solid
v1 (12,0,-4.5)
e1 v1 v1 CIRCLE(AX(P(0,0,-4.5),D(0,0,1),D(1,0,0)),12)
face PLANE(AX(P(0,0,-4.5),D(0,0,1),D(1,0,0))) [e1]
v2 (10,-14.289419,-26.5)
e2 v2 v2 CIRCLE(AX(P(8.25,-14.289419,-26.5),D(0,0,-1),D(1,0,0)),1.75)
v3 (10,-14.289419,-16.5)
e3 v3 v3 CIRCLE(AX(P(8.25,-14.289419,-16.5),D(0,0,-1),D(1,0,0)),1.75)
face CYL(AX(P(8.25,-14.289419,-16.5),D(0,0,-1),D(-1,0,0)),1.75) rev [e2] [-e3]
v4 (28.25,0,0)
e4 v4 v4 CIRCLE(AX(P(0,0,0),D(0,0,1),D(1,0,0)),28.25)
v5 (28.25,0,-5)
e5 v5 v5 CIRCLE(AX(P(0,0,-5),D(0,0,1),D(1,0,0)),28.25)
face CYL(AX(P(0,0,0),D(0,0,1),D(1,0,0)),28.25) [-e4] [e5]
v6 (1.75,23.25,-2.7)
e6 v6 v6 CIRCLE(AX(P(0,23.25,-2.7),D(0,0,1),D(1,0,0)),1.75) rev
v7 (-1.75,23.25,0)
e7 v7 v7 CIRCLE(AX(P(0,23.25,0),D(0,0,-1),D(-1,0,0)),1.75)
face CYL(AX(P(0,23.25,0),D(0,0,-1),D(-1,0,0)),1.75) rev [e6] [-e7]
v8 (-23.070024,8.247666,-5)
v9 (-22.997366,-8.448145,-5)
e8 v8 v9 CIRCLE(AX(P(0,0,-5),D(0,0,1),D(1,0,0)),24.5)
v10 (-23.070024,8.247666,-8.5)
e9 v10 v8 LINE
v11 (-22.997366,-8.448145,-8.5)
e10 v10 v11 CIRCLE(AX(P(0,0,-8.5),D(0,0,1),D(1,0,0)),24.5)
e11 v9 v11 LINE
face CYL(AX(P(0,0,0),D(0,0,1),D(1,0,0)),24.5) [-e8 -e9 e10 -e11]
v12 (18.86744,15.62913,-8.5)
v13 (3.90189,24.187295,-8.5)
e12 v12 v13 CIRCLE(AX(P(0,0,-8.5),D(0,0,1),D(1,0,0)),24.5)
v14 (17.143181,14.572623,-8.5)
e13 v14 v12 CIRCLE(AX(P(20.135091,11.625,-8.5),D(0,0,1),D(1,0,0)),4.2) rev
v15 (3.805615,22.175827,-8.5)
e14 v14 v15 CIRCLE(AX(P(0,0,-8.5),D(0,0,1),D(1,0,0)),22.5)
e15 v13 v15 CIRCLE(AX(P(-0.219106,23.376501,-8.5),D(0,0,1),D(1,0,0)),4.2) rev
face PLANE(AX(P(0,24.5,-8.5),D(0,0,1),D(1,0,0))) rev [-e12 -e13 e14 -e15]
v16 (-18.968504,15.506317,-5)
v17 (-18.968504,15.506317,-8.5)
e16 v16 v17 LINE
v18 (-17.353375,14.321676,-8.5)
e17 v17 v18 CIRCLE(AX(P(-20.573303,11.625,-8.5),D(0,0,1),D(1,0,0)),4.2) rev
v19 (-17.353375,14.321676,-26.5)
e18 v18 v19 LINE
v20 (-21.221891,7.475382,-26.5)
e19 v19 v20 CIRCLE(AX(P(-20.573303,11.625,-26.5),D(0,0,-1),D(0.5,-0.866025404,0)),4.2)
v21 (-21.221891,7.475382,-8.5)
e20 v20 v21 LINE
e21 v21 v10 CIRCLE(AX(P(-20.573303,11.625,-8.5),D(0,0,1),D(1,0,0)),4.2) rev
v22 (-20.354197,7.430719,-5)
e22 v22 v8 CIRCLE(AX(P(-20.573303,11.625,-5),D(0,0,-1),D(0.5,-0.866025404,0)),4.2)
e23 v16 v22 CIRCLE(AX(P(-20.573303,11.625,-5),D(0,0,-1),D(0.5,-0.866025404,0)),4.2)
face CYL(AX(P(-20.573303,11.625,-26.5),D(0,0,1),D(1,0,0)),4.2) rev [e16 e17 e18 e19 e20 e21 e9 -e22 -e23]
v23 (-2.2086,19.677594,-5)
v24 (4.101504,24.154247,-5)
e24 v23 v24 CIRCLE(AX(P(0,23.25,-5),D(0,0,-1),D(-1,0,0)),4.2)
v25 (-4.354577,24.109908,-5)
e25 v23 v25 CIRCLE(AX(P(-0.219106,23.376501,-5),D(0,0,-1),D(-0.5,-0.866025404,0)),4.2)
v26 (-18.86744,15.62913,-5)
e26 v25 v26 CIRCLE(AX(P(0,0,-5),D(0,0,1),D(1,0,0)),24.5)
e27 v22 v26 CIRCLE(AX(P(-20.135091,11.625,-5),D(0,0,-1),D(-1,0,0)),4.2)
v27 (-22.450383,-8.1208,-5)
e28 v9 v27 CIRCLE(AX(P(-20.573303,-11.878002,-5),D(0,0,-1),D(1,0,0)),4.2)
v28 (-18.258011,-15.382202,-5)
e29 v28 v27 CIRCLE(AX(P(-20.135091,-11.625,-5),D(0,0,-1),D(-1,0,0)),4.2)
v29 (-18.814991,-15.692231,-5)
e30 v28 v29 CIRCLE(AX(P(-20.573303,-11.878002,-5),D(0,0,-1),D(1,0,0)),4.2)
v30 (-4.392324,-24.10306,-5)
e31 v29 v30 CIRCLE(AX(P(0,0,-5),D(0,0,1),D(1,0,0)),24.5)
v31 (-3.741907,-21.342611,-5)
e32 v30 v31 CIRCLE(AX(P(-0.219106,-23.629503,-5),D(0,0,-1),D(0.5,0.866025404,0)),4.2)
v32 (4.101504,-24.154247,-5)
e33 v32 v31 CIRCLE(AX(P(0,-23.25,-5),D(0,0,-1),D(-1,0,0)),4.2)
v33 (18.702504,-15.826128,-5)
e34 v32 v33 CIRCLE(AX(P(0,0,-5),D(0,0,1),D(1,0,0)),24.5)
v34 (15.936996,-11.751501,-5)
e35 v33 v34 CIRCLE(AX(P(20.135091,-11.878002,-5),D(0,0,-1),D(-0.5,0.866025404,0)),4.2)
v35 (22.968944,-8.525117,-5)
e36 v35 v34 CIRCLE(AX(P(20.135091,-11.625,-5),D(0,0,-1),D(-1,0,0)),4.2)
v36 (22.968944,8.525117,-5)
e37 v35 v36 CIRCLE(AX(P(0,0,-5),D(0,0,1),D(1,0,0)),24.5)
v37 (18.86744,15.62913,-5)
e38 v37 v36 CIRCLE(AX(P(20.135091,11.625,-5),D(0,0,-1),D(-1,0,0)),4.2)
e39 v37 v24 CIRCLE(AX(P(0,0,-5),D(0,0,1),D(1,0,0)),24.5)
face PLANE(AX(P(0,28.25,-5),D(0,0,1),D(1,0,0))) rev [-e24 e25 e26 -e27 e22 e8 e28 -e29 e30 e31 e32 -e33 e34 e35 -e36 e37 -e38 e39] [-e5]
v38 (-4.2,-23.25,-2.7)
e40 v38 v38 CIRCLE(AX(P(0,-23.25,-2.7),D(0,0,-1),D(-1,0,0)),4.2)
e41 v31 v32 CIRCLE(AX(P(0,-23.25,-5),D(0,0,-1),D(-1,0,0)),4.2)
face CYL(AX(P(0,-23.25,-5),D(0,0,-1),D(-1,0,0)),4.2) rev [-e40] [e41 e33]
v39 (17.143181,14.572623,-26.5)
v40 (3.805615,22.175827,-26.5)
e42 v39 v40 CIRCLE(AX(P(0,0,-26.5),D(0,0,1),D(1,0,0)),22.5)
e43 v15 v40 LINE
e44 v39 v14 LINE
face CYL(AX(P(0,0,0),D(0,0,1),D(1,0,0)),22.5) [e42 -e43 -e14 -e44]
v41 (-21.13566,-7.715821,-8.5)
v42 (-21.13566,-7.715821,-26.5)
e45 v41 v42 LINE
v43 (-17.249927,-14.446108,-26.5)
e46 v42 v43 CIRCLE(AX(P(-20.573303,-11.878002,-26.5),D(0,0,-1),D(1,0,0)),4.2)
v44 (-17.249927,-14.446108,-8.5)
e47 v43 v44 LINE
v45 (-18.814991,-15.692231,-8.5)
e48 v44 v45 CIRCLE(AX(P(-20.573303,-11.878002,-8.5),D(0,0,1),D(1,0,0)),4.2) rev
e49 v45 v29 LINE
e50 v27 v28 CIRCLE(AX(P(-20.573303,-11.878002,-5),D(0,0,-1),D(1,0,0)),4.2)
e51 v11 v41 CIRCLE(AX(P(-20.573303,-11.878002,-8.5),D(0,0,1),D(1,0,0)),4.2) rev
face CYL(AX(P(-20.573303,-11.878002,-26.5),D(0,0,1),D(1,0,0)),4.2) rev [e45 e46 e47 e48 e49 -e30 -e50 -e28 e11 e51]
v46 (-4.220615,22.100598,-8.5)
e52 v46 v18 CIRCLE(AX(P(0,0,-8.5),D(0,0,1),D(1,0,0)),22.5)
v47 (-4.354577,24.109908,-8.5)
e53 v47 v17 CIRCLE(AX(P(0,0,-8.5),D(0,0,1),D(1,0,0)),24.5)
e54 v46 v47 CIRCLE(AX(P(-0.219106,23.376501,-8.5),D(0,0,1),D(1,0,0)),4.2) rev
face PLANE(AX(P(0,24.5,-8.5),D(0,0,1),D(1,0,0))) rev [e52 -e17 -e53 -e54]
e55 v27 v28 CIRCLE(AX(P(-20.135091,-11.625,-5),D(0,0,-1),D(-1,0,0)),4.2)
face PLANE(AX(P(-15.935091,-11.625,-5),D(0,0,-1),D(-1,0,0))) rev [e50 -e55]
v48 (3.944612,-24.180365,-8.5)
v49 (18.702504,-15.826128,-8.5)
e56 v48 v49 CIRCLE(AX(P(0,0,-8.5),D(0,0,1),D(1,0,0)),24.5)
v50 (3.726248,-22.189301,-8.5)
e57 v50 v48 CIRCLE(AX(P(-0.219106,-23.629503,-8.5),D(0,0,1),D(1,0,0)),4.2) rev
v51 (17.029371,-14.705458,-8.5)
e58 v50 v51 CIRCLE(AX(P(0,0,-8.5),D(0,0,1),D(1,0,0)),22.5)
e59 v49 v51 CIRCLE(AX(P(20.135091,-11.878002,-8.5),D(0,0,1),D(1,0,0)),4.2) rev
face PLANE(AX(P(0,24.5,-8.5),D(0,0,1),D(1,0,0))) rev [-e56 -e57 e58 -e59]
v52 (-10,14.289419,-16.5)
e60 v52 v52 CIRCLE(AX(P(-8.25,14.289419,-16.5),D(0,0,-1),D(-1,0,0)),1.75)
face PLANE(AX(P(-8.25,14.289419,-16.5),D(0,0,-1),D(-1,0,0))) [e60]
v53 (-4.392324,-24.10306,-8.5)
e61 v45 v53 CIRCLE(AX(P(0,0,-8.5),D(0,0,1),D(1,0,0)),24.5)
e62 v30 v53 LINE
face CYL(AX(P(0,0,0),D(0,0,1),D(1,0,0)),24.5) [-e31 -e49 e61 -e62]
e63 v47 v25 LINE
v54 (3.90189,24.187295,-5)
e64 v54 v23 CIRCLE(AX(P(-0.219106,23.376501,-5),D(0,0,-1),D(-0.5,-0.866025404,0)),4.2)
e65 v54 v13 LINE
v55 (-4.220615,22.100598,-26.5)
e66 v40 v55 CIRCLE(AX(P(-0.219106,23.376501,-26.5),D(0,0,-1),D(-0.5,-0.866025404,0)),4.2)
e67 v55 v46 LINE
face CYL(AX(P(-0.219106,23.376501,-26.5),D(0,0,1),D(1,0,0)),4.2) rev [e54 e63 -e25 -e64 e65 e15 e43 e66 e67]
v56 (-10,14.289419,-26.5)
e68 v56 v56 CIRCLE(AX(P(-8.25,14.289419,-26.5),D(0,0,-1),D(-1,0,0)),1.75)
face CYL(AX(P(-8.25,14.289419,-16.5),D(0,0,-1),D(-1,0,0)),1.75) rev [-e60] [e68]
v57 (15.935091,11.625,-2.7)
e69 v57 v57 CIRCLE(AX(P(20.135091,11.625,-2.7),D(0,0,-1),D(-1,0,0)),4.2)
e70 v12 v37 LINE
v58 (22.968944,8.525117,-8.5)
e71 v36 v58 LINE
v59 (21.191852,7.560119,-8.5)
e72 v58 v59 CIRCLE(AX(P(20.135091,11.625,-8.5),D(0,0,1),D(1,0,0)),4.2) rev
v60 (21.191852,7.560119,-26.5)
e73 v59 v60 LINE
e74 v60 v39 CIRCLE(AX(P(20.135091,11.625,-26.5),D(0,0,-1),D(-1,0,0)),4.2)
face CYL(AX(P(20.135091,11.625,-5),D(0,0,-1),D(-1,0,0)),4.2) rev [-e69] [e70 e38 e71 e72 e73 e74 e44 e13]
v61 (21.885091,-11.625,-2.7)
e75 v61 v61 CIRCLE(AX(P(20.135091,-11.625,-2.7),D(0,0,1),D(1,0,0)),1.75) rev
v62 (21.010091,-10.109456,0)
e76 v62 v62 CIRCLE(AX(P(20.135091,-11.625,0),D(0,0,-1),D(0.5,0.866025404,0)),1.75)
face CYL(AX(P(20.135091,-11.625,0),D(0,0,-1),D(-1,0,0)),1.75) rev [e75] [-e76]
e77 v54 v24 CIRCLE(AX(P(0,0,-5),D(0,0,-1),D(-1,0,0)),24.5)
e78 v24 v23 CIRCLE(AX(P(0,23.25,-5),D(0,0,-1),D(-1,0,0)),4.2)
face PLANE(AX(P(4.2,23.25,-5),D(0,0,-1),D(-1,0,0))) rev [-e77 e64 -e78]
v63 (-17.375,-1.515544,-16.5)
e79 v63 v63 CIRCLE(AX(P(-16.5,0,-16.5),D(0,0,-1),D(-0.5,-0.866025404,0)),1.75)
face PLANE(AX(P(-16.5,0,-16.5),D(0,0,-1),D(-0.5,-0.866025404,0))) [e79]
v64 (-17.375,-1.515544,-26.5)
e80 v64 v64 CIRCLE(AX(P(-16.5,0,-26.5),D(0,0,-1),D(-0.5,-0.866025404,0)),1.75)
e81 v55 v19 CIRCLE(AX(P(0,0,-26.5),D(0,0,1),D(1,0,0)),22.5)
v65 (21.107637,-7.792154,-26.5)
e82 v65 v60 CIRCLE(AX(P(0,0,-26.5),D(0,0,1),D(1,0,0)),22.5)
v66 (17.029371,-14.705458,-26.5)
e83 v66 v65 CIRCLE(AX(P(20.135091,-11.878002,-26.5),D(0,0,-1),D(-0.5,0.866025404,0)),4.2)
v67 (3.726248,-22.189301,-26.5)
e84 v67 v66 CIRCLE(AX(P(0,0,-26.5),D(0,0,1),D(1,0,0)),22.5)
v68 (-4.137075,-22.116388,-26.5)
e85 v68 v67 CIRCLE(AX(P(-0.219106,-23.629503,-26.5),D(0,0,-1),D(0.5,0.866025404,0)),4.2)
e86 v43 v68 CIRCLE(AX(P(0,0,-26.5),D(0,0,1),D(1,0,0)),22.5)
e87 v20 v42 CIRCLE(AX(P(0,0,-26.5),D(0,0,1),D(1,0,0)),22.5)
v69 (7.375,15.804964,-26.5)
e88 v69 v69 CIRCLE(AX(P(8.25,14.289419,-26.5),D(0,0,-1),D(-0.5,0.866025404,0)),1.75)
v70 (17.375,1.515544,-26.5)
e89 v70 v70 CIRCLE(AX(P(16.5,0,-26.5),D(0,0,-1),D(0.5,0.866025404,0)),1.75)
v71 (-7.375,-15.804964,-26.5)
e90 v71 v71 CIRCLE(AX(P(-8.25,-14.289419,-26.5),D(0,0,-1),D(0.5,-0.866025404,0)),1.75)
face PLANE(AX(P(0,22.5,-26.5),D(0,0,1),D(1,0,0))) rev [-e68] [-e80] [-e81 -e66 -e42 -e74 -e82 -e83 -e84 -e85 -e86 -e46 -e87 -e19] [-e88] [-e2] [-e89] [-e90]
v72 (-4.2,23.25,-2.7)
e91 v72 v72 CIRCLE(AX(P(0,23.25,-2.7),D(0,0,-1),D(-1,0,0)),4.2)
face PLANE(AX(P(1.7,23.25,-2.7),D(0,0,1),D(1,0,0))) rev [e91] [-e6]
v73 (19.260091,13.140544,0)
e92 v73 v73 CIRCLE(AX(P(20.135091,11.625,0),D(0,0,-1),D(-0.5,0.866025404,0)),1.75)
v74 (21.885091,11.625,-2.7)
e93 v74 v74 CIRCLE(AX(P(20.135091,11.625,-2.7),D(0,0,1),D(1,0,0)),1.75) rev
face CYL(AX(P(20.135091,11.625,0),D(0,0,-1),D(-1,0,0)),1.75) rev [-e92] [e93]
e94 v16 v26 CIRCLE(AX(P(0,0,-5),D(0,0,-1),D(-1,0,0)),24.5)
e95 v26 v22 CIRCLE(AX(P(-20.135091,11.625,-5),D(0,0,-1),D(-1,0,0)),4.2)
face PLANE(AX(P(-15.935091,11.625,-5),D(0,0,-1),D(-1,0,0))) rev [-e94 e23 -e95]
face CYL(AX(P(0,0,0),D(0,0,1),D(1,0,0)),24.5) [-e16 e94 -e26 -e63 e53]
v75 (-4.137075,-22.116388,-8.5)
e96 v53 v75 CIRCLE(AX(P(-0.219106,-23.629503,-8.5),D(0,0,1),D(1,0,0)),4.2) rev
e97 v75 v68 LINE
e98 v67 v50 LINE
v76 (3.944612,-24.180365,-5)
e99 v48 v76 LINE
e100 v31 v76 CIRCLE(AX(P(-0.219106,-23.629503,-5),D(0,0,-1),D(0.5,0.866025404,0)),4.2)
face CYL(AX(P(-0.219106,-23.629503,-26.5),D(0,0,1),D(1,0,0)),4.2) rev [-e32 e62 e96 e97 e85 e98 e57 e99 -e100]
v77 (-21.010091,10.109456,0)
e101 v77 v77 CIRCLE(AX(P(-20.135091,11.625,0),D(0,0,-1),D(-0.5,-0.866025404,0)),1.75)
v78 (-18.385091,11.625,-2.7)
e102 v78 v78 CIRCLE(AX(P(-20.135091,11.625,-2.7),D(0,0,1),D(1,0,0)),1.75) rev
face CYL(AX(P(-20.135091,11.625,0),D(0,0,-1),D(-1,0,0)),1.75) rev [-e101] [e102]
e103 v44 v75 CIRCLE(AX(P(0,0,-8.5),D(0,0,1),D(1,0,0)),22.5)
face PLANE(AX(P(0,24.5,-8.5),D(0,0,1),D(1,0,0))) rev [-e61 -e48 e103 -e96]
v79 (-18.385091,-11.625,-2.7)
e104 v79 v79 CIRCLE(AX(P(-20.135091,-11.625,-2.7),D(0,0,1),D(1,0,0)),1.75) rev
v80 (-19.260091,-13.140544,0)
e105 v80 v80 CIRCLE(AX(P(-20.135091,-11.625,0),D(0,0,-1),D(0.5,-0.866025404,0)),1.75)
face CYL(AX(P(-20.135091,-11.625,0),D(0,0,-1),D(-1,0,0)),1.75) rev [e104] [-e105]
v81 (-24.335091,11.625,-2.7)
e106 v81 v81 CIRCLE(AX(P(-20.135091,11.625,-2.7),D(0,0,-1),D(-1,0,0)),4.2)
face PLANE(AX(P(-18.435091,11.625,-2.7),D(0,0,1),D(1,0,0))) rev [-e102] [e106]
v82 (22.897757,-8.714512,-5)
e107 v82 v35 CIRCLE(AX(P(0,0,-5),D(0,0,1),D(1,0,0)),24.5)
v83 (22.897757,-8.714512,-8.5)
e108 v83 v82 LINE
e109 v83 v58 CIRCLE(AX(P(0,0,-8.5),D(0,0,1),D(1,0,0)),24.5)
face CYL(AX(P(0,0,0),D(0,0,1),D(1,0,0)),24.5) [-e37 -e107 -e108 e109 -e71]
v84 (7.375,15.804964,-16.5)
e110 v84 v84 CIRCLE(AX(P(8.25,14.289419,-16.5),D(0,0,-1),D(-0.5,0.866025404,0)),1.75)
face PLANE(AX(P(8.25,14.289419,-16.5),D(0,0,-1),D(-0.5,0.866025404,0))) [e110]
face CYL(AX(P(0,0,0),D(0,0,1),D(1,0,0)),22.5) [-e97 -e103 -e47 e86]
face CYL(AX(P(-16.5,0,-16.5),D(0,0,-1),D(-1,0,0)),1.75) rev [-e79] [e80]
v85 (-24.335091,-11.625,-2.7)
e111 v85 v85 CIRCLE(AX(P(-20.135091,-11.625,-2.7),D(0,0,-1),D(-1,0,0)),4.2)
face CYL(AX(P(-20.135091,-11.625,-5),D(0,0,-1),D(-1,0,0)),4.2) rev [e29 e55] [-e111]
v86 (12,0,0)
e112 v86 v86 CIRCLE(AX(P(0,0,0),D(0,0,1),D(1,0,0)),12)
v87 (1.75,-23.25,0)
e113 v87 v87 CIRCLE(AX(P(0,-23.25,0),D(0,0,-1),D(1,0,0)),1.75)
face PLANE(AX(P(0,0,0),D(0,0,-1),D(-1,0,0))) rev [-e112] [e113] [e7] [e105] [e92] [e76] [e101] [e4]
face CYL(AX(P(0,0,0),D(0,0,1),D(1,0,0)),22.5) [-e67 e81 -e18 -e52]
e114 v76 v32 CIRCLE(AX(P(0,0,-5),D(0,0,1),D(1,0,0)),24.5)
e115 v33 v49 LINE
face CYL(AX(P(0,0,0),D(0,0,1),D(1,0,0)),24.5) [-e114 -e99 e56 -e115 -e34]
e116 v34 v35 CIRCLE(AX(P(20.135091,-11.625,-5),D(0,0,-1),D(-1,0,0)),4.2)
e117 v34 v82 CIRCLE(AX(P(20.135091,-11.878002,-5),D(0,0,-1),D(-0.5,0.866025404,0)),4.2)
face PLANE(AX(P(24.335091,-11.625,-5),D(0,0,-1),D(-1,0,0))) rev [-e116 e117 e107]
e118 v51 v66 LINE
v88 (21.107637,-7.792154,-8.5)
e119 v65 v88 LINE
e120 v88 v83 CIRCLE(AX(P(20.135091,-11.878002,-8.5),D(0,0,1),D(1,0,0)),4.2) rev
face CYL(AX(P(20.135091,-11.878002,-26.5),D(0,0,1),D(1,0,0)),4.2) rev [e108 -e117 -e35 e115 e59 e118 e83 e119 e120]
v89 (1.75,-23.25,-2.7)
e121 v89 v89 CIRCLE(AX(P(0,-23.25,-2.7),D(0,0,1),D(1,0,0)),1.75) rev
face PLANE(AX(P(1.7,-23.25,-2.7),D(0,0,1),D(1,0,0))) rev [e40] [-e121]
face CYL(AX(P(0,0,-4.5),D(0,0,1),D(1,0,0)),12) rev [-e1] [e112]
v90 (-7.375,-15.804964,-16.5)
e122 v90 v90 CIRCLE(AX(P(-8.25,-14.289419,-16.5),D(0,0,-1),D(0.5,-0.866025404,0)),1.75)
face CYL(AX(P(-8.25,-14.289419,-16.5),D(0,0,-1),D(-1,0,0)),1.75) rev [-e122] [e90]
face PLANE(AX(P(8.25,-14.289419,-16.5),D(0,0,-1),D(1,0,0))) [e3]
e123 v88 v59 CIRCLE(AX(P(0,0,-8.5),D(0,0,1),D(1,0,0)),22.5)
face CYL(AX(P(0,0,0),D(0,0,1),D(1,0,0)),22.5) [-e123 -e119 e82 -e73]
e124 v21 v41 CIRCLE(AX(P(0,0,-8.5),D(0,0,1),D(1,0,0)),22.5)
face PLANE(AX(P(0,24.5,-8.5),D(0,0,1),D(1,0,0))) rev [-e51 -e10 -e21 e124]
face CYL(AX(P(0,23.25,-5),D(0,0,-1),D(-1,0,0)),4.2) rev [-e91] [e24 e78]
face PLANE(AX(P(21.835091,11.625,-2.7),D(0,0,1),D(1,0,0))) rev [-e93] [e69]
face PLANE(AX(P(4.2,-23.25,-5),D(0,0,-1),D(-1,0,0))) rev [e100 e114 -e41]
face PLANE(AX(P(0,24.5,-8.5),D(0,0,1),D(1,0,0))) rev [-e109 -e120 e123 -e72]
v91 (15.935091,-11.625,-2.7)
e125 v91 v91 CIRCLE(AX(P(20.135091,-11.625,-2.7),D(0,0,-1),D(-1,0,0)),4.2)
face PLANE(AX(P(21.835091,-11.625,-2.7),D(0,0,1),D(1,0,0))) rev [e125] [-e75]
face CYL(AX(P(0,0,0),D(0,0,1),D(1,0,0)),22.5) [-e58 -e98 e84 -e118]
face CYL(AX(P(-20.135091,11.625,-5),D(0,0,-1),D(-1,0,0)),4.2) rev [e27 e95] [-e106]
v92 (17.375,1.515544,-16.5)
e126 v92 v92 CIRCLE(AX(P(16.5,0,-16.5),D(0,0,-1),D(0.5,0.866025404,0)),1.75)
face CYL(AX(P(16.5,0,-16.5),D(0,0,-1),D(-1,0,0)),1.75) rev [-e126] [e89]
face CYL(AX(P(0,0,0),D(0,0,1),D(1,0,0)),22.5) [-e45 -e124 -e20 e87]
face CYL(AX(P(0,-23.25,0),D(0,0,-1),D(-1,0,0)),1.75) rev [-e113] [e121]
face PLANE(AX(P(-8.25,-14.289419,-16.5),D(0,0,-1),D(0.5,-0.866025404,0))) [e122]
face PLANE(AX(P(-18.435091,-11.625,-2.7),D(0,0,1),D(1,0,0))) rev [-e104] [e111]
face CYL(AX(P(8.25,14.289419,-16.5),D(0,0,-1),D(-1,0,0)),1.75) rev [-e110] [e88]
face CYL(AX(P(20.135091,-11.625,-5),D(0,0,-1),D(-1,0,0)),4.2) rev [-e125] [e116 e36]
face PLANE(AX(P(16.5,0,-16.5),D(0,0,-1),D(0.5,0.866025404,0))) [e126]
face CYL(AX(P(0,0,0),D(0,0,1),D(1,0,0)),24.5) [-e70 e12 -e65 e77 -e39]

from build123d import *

# Parameters (mm, degrees)
SKETCH2_R                                     = 1.75
CUT_EXTRUDE1_DEPTH                            = 46.369317826
CIRPATTERN1_COUNT                             = 6
SKETCH5_OUTSIDE_W                             = 75.336
SKETCH5_OUTSIDE_H                             = 75.336
SKETCH5_OUTSIDE_R                             = 1.75
CUT_EXTRUDE2_DEPTH                            = 10
CIRPATTERN2_COUNT                             = 6
SKETCH6_R                                     = 12
CUT_EXTRUDE3_DEPTH                            = 4.5
CBORE_FOR_M3_HEX_HEAD_MACHINE_SCREW1_AT_COUNT = 2
CBORE_FOR_M3_HEX_HEAD_MACHINE_SCREW1_AT_PITCH = 23.25
CBORE_FOR_M3_HEX_HEAD_MACHINE_SCREW1_2_COUNT  = 2
CBORE_FOR_M3_HEX_HEAD_MACHINE_SCREW1_2_PITCH  = 40.270181276
CBORE_FOR_M3_HEX_HEAD_MACHINE_SCREW1_3_COUNT  = 2
CBORE_FOR_M3_HEX_HEAD_MACHINE_SCREW1_3_PITCH  = 46.5
CBORE_FOR_M3_HEX_HEAD_MACHINE_SCREW1_4_COUNT  = 2
CBORE_FOR_M3_HEX_HEAD_MACHINE_SCREW1_4_PITCH  = 40.270181276
CBORE_FOR_M3_HEX_HEAD_MACHINE_SCREW1_5_COUNT  = 2
CBORE_FOR_M3_HEX_HEAD_MACHINE_SCREW1_5_PITCH  = 23.25
SKETCH9_R                                     = 4.2
CUT_EXTRUDE4_DEPTH                            = 46.369317826
CIRPATTERN3_START                             = -26.5
CIRPATTERN3_DEPTH                             = 21.5


# Read off the part's stored shape, not the designer's step: CirPattern3
with BuildPart() as part:
    # Sketch1 → Revolve1 (revolve)
    with BuildSketch(Plane(origin=(0, 0, 0), x_dir=(0, 0, -1), z_dir=(1, 0, 0)), mode=Mode.PRIVATE) as revolve1_sk:
        Polygon((0, 0), (0, 28.25), (5, 28.25), (5, 24.5), (8.5, 24.5), (8.5, 22.5), (26.5, 22.5), (26.5, 0), align=None)
    revolve(revolve1_sk.sketch.rotate(Axis((0, 0, 0), (0, 0, -1)), 90), axis=Axis((0, 0, 0), (0, 0, -1)))

    # Sketch2 → Cut-Extrude1 (cut, symmetric)
    with BuildSketch(Plane(origin=(0, 0, -5), x_dir=(-1, 0, 0), z_dir=(0, 0, -1))):
        with Locations((0, 23.25)):
            Circle(SKETCH2_R)
    cut_extrude1 = extrude(amount=CUT_EXTRUDE1_DEPTH, both=True, mode=Mode.SUBTRACT)

    # CirPattern1: Cut-Extrude1 ×6 about axis
    cirpattern1_axis = Axis((0, 0, 0), (0, 0, 1))
    for i in range(1, CIRPATTERN1_COUNT):
        add(cut_extrude1.rotate(cirpattern1_axis, i * 360 / CIRPATTERN1_COUNT), mode=Mode.SUBTRACT)

    # Sketch5 outside → Cut-Extrude2 (cut)
    # profile 1 of 2: a face of its own
    with BuildSketch(Plane(origin=(0, 0, -26.5), x_dir=(-1, 0, 0), z_dir=(0, 0, -1))):
        Rectangle(SKETCH5_OUTSIDE_W, SKETCH5_OUTSIDE_H)
        with BuildLine():
            ThreePointArc((-1.554498096, 22.446236559), (-11.25, 19.485571585), (-18.661762031, 12.569353121))
            ThreePointArc((-18.661762031, 12.569353121), (-18.619546181, 10.75), (-20.216260128, 9.876883438))
            ThreePointArc((-20.216260128, 9.876883438), (-22.5, 0), (-20.216260128, -9.876883438))
            ThreePointArc((-20.216260128, -9.876883438), (-18.619546181, -10.75), (-18.661762031, -12.569353121))
            ThreePointArc((-18.661762031, -12.569353121), (-11.25, -19.485571585), (-1.554498096, -22.446236559))
            ThreePointArc((-1.554498096, -22.446236559), (0, -21.5), (1.554498096, -22.446236559))
            ThreePointArc((1.554498096, -22.446236559), (11.25, -19.485571585), (18.661762031, -12.569353121))
            ThreePointArc((18.661762031, -12.569353121), (18.619546181, -10.75), (20.216260128, -9.876883438))
            ThreePointArc((20.216260128, -9.876883438), (22.5, 0), (20.216260128, 9.876883438))
            ThreePointArc((20.216260128, 9.876883438), (18.619546181, 10.75), (18.661762031, 12.569353121))
            ThreePointArc((18.661762031, 12.569353121), (11.25, 19.485571585), (1.554498096, 22.446236559))
            ThreePointArc((1.554498096, 22.446236559), (0, 21.5), (-1.554498096, 22.446236559))
        make_face(mode=Mode.SUBTRACT)
    # profile 2 of 2: a face of its own
    with BuildSketch(Plane(origin=(0, 0, -26.5), x_dir=(-1, 0, 0), z_dir=(0, 0, -1))):
        with Locations((8.25, 14.289419162)):
            Circle(SKETCH5_OUTSIDE_R)
    cut_extrude2 = extrude(amount=-CUT_EXTRUDE2_DEPTH, mode=Mode.SUBTRACT)

    # CirPattern2: Cut-Extrude2 ×6 about axis
    cirpattern2_axis = Axis((0, 0, 0), (0, 0, 1))
    for i in range(1, CIRPATTERN2_COUNT):
        add(cut_extrude2.rotate(cirpattern2_axis, i * 360 / CIRPATTERN2_COUNT), mode=Mode.SUBTRACT)

    # Sketch6 → Cut-Extrude3 (cut)
    with BuildSketch(Plane.XY):
        Circle(SKETCH6_R)
    extrude(amount=-CUT_EXTRUDE3_DEPTH, mode=Mode.SUBTRACT)

    # Sketch8 → CBORE for M3 Hex Head Machine Screw1 (revolve, cut)
    with BuildSketch(Plane(origin=(20.135090638, 11.625, -5), x_dir=(0, 1, 0), z_dir=(1, 0, 0))):
        Polygon((0, 0), (0, 5), (1.7, 5), (1.7, 2.3), (4.2, 2.3), (4.2, 0), align=None)
    cbore_for_m3_hex_head_machine_screw1 = revolve(axis=Axis((20.135090638, 11.625, -11.35), (0, 0, 1)), mode=Mode.SUBTRACT)

    # CBORE for M3 Hex Head Machine Screw1 at: CBORE for M3 Hex Head Machine Screw1 ×2
    with Locations(*[Vector(-0.8660254037844417, 0.49999999999999484, 0) * (i * CBORE_FOR_M3_HEX_HEAD_MACHINE_SCREW1_AT_PITCH) for i in range(1, CBORE_FOR_M3_HEX_HEAD_MACHINE_SCREW1_AT_COUNT)]):
        add(cbore_for_m3_hex_head_machine_screw1, mode=Mode.SUBTRACT)

    # CBORE for M3 Hex Head Machine Screw1 2: CBORE for M3 Hex Head Machine Screw1 ×2
    with Locations(*[(-i * CBORE_FOR_M3_HEX_HEAD_MACHINE_SCREW1_2_PITCH, 0, 0) for i in range(1, CBORE_FOR_M3_HEX_HEAD_MACHINE_SCREW1_2_COUNT)]):
        add(cbore_for_m3_hex_head_machine_screw1, mode=Mode.SUBTRACT)

    # CBORE for M3 Hex Head Machine Screw1 3: CBORE for M3 Hex Head Machine Screw1 ×2
    with Locations(*[Vector(-0.8660254037844346, -0.5000000000000071, 0) * (i * CBORE_FOR_M3_HEX_HEAD_MACHINE_SCREW1_3_PITCH) for i in range(1, CBORE_FOR_M3_HEX_HEAD_MACHINE_SCREW1_3_COUNT)]):
        add(cbore_for_m3_hex_head_machine_screw1, mode=Mode.SUBTRACT)

    # CBORE for M3 Hex Head Machine Screw1 4: CBORE for M3 Hex Head Machine Screw1 ×2
    with Locations(*[Vector(-0.49999999999999495, -0.8660254037844416, 0) * (i * CBORE_FOR_M3_HEX_HEAD_MACHINE_SCREW1_4_PITCH) for i in range(1, CBORE_FOR_M3_HEX_HEAD_MACHINE_SCREW1_4_COUNT)]):
        add(cbore_for_m3_hex_head_machine_screw1, mode=Mode.SUBTRACT)

    # CBORE for M3 Hex Head Machine Screw1 5: CBORE for M3 Hex Head Machine Screw1 ×2
    with Locations(*[(0, -i * CBORE_FOR_M3_HEX_HEAD_MACHINE_SCREW1_5_PITCH, 0) for i in range(1, CBORE_FOR_M3_HEX_HEAD_MACHINE_SCREW1_5_COUNT)]):
        add(cbore_for_m3_hex_head_machine_screw1, mode=Mode.SUBTRACT)

    # Sketch9 → Cut-Extrude4 (cut, through all)
    with BuildSketch(Plane(origin=(0, 0, -5), x_dir=(-1, 0, 0), z_dir=(0, 0, -1))):
        with Locations((-20.135090638, 11.625)):
            Circle(SKETCH9_R)
    extrude(amount=CUT_EXTRUDE4_DEPTH, mode=Mode.SUBTRACT)

    # CirPattern3 outline → CirPattern3 (cut)
    with BuildSketch(Plane.XY.offset(CIRPATTERN3_START)):
        with BuildLine():
            ThreePointArc((-1.256823209, 24.467741935), (-2.811398825, 24.338160091), (-4.35457664, 24.109907969))
            ThreePointArc((-4.35457664, 24.109907969), (-0.179741778, 19.176685596), (3.901890218, 24.187295275))
            ThreePointArc((3.901890218, 24.187295275), (2.58316543, 24.363440979), (1.256823209, 24.467741935))
            ThreePointArc((1.256823209, 24.467741935), (0, 21.5), (-1.256823209, 24.467741935))
        make_face()
        with BuildLine():
            ThreePointArc((-18.968503996, 15.506316654), (-19.795032609, 14.436297449), (-20.561274485, 13.322311795))
            ThreePointArc((-20.561274485, 13.322311795), (-18.619546181, 10.75), (-21.818097694, 11.145430141))
            ThreePointArc((-21.818097694, 11.145430141), (-22.490778714, 9.716731593), (-23.070024017, 8.247665844))
            ThreePointArc((-23.070024017, 8.247665844), (-16.916681459, 9.558816026), (-18.968503996, 15.506316654))
        make_face()
        with BuildLine():
            ThreePointArc((-21.818097694, -11.145430141), (-18.619546181, -10.75), (-20.561274485, -13.322311795))
            ThreePointArc((-20.561274485, -13.322311795), (-19.723759912, -14.533523143), (-18.81499127, -15.692230674))
            ThreePointArc((-18.81499127, -15.692230674), (-16.935996673, -9.778002238), (-22.997366041, -8.448145074))
            ThreePointArc((-22.997366041, -8.448145074), (-22.448280204, -9.814515571), (-21.818097694, -11.145430141))
        make_face()
        with BuildLine():
            ThreePointArc((-1.256823209, -24.467741935), (0, -21.5), (1.256823209, -24.467741935))
            ThreePointArc((1.256823209, -24.467741935), (2.604684023, -24.361149832), (3.944612144, -24.180364659))
            ThreePointArc((3.944612144, -24.180364659), (-0.18016322, -19.429683905), (-4.392323866, -24.103059786))
            ThreePointArc((-4.392323866, -24.103059786), (-2.830452956, -24.335951513), (-1.256823209, -24.467741935))
        make_face()
        with BuildLine():
            ThreePointArc((20.561274485, -13.322311795), (18.619546181, -10.75), (21.818097694, -11.145430141))
            ThreePointArc((21.818097694, -11.145430141), (22.390941527, -9.944633606), (22.897757266, -8.714511586))
            ThreePointArc((22.897757266, -8.714511586), (16.517625997, -9.744003743), (18.702504464, -15.826127977))
            ThreePointArc((18.702504464, -15.826127977), (19.671765509, -14.603822849), (20.561274485, -13.322311795))
        make_face()
    extrude(amount=CIRPATTERN3_DEPTH, mode=Mode.SUBTRACT)


solid = part.part
